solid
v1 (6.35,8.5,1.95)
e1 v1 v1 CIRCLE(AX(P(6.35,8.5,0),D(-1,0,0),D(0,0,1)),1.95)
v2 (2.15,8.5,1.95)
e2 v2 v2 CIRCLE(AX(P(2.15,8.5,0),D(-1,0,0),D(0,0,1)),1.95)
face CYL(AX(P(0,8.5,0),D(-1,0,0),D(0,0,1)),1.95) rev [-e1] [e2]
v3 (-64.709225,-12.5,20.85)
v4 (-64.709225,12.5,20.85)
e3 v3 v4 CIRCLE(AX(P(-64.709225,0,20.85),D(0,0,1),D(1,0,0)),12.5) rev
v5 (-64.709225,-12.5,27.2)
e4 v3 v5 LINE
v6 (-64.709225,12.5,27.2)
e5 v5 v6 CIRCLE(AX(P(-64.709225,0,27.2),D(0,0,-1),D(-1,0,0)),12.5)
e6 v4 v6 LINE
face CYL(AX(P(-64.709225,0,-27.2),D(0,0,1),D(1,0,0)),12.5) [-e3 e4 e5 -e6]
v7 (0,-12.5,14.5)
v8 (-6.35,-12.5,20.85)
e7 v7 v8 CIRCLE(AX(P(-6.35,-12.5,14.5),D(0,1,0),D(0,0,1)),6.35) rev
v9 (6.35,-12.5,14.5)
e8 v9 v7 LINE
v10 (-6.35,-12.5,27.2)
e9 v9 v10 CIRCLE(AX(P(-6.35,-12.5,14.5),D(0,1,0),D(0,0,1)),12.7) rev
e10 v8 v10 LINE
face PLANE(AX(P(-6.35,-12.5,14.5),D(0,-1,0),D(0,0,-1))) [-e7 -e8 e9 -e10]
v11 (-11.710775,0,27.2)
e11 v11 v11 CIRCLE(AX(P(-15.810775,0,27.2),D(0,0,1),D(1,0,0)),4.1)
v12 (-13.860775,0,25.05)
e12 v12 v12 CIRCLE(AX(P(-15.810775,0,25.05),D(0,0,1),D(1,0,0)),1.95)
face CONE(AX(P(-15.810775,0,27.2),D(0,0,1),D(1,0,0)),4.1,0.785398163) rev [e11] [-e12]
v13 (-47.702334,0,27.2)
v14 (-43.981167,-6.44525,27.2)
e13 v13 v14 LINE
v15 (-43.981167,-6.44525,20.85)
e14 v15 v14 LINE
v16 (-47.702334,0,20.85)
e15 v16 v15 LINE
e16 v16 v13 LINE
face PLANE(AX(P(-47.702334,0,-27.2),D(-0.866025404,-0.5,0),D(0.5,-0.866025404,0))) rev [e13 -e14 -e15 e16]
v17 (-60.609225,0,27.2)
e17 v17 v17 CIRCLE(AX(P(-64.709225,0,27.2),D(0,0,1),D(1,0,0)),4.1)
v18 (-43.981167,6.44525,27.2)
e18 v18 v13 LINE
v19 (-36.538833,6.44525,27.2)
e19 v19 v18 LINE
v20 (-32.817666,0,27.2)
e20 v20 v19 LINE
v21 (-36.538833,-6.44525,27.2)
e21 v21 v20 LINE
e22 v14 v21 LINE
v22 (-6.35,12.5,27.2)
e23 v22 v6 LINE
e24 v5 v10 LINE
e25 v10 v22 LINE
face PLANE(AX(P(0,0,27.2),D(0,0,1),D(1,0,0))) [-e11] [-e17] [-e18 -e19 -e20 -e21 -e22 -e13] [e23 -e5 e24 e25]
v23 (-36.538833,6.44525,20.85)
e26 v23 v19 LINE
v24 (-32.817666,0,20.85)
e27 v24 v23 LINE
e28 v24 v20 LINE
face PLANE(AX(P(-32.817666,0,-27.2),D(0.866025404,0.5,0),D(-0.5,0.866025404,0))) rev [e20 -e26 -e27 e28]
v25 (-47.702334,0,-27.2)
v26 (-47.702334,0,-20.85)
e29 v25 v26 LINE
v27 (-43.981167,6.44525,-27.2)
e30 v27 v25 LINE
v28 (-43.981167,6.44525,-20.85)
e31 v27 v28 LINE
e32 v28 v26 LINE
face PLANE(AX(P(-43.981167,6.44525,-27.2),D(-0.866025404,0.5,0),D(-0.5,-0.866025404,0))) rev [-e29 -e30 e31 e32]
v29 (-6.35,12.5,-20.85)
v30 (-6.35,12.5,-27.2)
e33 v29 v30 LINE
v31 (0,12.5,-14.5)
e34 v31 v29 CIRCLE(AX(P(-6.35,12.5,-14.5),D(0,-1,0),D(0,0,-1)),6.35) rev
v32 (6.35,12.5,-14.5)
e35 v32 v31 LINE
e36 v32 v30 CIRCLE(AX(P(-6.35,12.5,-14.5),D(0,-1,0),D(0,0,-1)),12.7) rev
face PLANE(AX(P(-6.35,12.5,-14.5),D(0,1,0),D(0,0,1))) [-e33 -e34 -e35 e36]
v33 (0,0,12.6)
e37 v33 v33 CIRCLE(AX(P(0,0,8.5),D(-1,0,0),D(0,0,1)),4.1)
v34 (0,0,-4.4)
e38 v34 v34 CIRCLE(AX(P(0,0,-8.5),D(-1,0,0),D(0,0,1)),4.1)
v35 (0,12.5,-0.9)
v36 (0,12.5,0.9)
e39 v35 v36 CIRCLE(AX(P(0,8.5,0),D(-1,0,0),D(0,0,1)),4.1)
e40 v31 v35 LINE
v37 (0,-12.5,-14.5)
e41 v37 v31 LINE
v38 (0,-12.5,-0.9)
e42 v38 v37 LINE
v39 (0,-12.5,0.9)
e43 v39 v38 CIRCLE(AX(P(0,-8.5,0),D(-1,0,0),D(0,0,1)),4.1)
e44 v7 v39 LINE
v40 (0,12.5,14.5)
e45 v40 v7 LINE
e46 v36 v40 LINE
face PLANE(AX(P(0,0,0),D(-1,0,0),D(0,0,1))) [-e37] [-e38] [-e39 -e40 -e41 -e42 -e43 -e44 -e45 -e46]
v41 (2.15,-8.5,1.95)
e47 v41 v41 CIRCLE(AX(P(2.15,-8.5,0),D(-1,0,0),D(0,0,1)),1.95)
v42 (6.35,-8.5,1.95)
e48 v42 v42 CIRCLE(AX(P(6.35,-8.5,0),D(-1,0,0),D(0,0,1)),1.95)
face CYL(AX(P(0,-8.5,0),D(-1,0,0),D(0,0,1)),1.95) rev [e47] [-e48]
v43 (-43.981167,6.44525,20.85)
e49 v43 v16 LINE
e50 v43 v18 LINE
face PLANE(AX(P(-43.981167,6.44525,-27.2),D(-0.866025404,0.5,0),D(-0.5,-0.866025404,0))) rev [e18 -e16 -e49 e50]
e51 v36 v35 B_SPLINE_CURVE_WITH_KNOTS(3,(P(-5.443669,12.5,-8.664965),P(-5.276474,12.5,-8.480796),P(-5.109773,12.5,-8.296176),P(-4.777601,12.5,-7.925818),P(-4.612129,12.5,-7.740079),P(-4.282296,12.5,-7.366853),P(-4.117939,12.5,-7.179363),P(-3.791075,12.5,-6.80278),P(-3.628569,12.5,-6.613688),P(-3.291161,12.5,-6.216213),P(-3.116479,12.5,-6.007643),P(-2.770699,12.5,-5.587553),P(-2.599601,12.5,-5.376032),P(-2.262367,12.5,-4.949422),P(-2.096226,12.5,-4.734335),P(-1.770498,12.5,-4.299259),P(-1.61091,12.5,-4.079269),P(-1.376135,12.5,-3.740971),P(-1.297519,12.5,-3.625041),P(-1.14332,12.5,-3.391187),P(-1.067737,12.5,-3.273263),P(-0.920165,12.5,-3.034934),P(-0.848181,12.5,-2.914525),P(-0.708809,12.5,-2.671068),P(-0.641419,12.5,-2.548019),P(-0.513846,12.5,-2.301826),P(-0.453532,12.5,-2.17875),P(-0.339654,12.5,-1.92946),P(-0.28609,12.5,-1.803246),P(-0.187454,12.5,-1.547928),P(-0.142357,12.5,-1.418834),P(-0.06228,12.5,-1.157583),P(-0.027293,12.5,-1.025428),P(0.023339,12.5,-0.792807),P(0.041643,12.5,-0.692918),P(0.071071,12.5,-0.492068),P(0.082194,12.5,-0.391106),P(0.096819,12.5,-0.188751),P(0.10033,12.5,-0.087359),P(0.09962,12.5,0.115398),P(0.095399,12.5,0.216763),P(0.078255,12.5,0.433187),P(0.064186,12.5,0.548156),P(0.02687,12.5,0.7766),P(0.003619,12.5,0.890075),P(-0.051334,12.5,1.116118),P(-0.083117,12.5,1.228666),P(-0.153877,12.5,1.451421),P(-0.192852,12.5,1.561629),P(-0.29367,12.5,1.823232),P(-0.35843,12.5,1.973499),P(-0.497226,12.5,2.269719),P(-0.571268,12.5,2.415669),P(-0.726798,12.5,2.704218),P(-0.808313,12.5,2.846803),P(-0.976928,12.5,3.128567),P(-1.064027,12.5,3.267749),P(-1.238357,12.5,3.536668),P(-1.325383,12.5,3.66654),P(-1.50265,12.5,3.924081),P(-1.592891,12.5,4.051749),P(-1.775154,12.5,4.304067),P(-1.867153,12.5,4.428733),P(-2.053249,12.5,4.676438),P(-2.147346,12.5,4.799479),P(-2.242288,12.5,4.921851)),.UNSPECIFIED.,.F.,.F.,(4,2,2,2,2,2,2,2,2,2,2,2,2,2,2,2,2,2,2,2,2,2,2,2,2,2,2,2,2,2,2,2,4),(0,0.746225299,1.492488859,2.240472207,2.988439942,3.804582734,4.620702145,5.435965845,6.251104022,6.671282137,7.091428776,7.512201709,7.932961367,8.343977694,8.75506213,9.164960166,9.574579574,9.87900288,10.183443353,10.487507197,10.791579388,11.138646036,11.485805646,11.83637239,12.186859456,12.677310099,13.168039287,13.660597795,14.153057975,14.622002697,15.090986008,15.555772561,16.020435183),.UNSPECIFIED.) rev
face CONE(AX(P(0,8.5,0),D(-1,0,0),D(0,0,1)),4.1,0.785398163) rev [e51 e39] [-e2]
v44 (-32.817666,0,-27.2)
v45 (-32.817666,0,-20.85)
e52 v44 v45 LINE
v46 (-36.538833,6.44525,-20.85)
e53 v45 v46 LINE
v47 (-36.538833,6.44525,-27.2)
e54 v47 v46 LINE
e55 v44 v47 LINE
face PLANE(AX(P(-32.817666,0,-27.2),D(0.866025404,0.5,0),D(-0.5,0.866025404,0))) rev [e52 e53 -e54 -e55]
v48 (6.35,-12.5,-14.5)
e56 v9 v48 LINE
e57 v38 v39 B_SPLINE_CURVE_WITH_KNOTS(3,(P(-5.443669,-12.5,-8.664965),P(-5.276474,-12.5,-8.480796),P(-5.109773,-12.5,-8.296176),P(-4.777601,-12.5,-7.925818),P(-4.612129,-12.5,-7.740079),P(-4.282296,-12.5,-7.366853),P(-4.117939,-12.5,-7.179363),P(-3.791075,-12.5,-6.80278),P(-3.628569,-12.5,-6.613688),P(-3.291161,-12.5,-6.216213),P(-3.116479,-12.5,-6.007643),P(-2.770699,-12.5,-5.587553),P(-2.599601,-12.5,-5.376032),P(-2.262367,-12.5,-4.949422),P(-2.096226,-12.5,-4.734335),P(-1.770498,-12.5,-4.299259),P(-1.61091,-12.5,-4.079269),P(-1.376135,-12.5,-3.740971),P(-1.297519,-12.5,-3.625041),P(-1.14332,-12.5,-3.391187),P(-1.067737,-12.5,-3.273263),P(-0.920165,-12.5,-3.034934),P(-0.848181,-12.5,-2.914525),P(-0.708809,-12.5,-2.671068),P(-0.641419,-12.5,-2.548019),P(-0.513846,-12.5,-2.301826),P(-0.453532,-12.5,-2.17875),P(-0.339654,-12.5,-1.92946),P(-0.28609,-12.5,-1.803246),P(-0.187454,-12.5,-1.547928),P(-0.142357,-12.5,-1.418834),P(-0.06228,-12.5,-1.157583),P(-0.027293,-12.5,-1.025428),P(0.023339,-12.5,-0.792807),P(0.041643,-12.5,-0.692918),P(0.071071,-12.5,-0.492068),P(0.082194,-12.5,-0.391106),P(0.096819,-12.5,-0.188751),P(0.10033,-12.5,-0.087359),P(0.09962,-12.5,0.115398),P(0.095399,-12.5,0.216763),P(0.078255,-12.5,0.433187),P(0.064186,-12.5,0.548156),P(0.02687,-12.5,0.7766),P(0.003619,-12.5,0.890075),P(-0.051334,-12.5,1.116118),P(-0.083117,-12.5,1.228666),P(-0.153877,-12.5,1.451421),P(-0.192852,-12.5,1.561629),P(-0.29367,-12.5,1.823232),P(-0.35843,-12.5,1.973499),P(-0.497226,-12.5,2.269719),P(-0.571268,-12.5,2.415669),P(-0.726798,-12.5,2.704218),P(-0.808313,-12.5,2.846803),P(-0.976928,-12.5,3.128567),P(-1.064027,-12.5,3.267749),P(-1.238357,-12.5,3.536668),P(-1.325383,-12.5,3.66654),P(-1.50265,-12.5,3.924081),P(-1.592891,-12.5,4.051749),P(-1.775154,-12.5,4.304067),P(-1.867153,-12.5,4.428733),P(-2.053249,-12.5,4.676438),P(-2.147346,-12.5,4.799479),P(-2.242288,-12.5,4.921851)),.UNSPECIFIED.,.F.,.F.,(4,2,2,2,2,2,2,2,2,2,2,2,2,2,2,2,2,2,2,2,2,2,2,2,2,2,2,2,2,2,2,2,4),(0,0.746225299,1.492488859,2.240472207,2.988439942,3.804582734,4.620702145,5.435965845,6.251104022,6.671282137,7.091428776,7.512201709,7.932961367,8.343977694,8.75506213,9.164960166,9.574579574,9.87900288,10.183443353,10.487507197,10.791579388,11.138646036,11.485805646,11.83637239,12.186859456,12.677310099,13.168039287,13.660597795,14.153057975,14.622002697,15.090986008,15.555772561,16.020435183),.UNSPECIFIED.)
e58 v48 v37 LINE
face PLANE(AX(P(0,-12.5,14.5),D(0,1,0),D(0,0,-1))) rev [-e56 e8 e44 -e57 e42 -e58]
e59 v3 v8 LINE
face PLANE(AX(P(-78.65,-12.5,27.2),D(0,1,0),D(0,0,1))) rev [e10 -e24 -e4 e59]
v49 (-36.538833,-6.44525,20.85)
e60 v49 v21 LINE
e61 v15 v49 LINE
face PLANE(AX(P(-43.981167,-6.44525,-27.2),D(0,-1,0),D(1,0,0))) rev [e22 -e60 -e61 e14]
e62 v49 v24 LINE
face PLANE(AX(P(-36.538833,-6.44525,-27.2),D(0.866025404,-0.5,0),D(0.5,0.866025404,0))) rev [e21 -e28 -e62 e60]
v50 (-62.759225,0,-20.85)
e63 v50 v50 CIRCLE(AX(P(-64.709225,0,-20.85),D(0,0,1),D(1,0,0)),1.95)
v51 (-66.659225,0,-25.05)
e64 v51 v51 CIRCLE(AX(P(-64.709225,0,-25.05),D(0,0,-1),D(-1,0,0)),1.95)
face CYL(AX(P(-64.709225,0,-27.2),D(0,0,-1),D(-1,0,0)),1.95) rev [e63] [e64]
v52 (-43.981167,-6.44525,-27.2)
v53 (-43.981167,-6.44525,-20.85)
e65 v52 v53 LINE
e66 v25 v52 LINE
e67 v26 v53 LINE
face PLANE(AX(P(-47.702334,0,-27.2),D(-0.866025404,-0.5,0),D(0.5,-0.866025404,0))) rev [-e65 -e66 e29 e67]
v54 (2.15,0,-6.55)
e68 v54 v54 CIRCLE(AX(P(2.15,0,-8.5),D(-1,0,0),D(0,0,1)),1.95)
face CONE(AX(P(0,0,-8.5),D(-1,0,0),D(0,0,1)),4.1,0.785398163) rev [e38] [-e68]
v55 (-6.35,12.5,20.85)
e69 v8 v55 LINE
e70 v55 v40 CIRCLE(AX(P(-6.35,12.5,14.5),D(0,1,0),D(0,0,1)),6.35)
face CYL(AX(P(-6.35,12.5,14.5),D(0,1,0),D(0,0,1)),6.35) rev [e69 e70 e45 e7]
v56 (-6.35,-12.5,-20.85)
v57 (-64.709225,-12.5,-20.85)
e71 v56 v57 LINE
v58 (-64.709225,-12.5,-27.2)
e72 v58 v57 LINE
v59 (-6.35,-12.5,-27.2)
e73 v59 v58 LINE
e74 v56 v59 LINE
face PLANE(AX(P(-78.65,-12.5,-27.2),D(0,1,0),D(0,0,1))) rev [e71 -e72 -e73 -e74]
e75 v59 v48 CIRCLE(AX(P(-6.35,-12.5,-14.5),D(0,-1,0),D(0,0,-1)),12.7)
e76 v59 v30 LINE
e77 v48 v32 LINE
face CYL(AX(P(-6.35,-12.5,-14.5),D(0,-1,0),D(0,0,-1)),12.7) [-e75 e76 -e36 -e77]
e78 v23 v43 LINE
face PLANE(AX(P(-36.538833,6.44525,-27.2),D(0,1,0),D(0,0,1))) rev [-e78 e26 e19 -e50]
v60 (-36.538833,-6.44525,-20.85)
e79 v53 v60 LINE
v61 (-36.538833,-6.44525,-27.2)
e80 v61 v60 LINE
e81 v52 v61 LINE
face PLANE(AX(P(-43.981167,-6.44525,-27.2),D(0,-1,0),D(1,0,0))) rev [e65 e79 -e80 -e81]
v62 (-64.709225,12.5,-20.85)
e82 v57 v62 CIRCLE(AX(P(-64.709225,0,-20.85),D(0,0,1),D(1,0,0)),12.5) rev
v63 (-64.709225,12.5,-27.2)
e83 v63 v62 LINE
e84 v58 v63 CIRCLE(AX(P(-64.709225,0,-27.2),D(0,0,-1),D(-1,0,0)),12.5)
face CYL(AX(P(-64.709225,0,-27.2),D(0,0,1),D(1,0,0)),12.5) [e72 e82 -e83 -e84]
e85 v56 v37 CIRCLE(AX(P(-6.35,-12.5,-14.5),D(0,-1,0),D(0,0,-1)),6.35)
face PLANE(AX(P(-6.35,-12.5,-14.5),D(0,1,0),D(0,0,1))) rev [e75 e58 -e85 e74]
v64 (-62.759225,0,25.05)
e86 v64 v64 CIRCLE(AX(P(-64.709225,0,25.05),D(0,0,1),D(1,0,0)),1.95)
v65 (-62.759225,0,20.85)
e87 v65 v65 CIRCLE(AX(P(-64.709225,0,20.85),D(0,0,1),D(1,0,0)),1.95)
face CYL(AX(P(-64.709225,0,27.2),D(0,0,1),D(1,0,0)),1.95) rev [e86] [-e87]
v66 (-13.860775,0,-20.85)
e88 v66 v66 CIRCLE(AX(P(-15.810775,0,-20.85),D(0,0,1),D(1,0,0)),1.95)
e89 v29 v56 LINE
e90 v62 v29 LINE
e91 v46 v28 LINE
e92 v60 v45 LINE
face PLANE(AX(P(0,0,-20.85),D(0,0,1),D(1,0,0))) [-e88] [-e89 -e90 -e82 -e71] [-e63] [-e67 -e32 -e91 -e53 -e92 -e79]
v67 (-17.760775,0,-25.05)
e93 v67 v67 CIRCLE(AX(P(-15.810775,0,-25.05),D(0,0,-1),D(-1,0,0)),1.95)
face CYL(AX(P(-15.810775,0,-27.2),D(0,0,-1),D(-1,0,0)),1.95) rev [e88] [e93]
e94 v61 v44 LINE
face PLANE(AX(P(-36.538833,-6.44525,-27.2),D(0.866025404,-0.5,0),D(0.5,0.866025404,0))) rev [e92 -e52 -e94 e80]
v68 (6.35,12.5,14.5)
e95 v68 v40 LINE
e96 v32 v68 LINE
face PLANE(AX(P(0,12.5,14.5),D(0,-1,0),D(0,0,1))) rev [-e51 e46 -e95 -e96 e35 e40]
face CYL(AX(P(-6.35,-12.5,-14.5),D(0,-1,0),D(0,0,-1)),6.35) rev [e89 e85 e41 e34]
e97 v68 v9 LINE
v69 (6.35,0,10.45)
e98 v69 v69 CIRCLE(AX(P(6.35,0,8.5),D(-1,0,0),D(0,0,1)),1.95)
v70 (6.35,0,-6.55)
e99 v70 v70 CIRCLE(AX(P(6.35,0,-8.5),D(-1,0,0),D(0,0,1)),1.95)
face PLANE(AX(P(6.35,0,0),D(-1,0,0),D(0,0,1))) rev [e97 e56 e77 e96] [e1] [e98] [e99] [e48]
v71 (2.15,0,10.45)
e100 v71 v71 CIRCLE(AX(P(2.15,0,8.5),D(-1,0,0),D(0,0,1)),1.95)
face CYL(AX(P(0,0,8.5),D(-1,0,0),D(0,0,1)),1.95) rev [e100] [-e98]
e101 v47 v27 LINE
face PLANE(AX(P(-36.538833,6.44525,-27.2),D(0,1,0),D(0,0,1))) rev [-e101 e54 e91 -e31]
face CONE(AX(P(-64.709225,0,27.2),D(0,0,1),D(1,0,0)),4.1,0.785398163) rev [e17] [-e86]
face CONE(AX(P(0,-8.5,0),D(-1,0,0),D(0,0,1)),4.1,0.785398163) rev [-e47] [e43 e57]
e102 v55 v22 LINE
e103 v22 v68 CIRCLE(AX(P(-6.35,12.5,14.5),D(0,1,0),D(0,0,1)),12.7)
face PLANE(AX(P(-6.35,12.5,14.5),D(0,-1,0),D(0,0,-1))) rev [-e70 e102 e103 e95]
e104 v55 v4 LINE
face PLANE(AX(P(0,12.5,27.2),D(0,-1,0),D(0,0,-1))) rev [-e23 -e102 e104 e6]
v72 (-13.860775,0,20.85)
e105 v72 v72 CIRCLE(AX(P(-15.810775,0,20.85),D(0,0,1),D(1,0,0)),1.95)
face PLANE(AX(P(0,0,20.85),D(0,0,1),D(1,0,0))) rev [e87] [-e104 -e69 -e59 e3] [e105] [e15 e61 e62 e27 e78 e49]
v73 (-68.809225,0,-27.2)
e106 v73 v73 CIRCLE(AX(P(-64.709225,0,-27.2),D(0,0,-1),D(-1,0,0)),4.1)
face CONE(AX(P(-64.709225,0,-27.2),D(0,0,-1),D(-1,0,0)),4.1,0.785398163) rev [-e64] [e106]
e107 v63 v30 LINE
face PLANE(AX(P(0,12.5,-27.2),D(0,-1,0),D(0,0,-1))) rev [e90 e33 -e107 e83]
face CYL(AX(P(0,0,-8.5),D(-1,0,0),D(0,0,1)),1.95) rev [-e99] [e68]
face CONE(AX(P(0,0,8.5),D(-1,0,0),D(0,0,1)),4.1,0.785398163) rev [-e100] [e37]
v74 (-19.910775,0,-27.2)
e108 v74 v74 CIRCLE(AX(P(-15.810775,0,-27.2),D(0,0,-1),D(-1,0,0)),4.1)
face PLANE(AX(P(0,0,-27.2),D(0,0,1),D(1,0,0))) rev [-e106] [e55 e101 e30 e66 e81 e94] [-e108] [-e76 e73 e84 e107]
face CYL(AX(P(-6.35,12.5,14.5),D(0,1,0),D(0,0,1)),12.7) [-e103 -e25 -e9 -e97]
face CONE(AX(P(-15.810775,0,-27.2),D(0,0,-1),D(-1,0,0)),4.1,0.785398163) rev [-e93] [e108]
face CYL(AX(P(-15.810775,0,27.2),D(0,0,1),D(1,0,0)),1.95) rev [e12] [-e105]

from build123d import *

# Parameters (mm, degrees)
SKETCH2_W                                         = 29
SKETCH2_H                                         = 25
BOSS_EXTRUDE1_DEPTH                               = 6.35
CSK_FOR_M3_5_FLAT_HEAD_MACHINE_SCREW1_D           = 3.9
CSK_FOR_M3_5_FLAT_HEAD_MACHINE_SCREW1_CSINK_D     = 8.2
CSK_FOR_M3_5_FLAT_HEAD_MACHINE_SCREW1_CSINK_ANGLE = 90
EDGE_FLANGE1_DEPTH                                = 25
EDGE_FLANGE1_BEND_DEPTH                           = 25
CSK_FOR_M3_5_FLAT_HEAD_MACHINE_SCREW2_D           = 3.9
CSK_FOR_M3_5_FLAT_HEAD_MACHINE_SCREW2_DEPTH       = 6.35
CSK_FOR_M3_5_FLAT_HEAD_MACHINE_SCREW2_CSINK_D     = 8.2
CSK_FOR_M3_5_FLAT_HEAD_MACHINE_SCREW2_CSINK_ANGLE = 90
CUT_EXTRUDE1_DEPTH                                = 97.44393449
CUT_EXTRUDE2_DEPTH                                = 97.44393449


# Sheet-metal steps are written as plain solids
with BuildPart() as part:
    # Sketch2 → Boss-Extrude1 (new body)
    with BuildSketch(Plane(origin=(0, 0, 0), x_dir=(0, 0, -1), z_dir=(1, 0, 0))):
        Rectangle(SKETCH2_W, SKETCH2_H)
    extrude(amount=BOSS_EXTRUDE1_DEPTH)

    # CSK for M3.5 Flat Head Machine Screw1 (through all)
    with Locations(Plane.ZY):
        with Locations((0, -8.5), (8.5, 0), (0, 8.5), (-8.5, 0)):
            CounterSinkHole(CSK_FOR_M3_5_FLAT_HEAD_MACHINE_SCREW1_D / 2, CSK_FOR_M3_5_FLAT_HEAD_MACHINE_SCREW1_CSINK_D / 2, counter_sink_angle=CSK_FOR_M3_5_FLAT_HEAD_MACHINE_SCREW1_CSINK_ANGLE)

    # Edge-Flange1 section (across the edge) → Edge-Flange1 (add)
    with BuildSketch(Plane(origin=(0, 12.5, -20.85), x_dir=(0, 0, 1), z_dir=(0, -1, 0))):
        with BuildLine():
            Line((-6.35, 6.35), (-6.35, 78.65))
            Line((-6.35, 78.65), (0, 78.65))
            Line((0, 78.65), (0, 6.35))
            ThreePointArc((0, 6.35), (1.859871939, 1.859871939), (6.35, 0))
            Line((6.35, 0), (6.35, -6.35))
            ThreePointArc((6.35, -6.35), (-2.630256121, -2.630256121), (-6.35, 6.35))
        make_face()
    extrude(amount=EDGE_FLANGE1_DEPTH)

    # Edge-Flange1 section 2 (across the edge) → Edge-Flange1 bend (add)
    with BuildSketch(Plane(origin=(0, -12.5, 20.85), x_dir=(0, 0, -1), z_dir=(0, 1, 0))):
        with BuildLine():
            Line((-6.35, 6.35), (-6.35, 78.65))
            Line((-6.35, 78.65), (0, 78.65))
            Line((0, 78.65), (0, 6.35))
            ThreePointArc((0, 6.35), (1.859871939, 1.859871939), (6.35, 0))
            Line((6.35, 0), (6.35, -6.35))
            ThreePointArc((6.35, -6.35), (-2.630256121, -2.630256121), (-6.35, 6.35))
        make_face()
    extrude(amount=EDGE_FLANGE1_BEND_DEPTH)

    # CSK for M3.5 Flat Head Machine Screw2
    with Locations(Plane.XY.offset(27.2)):
        with Locations((-64.709225, 0), (-15.810775, 0)):
            csk_for_m3_5_flat_head_machine_screw2 = CounterSinkHole(CSK_FOR_M3_5_FLAT_HEAD_MACHINE_SCREW2_D / 2, CSK_FOR_M3_5_FLAT_HEAD_MACHINE_SCREW2_CSINK_D / 2, depth=CSK_FOR_M3_5_FLAT_HEAD_MACHINE_SCREW2_DEPTH, counter_sink_angle=CSK_FOR_M3_5_FLAT_HEAD_MACHINE_SCREW2_CSINK_ANGLE)

    # Mirror1: CSK for M3.5 Flat Head Machine Screw2 across plane
    add(csk_for_m3_5_flat_head_machine_screw2.mirror(Plane.XY), mode=Mode.SUBTRACT)

    # Sketch20 → Cut-Extrude1 (cut, through all)
    with BuildSketch(Plane.XY.offset(27.2)):
        Polygon((-32.817666355, 0), (-36.538833178, 6.44525), (-43.981166822, 6.44525), (-47.702333645, 0), (-43.981166822, -6.44525), (-36.538833178, -6.44525), align=None)
    extrude(amount=-CUT_EXTRUDE1_DEPTH, mode=Mode.SUBTRACT)

    # Sketch21 → Cut-Extrude2 (cut, through all)
    with BuildSketch(Plane.XY.offset(27.2)):
        with BuildLine():
            Line((-64.709225, -12.5), (-78.65, -12.5))
            Line((-78.65, -12.5), (-78.65, 12.5))
            Line((-78.65, 12.5), (-64.709225, 12.5))
            ThreePointArc((-64.709225, 12.5), (-77.209225, 0), (-64.709225, -12.5))
        make_face()
    extrude(amount=-CUT_EXTRUDE2_DEPTH, mode=Mode.SUBTRACT)


solid = part.part
